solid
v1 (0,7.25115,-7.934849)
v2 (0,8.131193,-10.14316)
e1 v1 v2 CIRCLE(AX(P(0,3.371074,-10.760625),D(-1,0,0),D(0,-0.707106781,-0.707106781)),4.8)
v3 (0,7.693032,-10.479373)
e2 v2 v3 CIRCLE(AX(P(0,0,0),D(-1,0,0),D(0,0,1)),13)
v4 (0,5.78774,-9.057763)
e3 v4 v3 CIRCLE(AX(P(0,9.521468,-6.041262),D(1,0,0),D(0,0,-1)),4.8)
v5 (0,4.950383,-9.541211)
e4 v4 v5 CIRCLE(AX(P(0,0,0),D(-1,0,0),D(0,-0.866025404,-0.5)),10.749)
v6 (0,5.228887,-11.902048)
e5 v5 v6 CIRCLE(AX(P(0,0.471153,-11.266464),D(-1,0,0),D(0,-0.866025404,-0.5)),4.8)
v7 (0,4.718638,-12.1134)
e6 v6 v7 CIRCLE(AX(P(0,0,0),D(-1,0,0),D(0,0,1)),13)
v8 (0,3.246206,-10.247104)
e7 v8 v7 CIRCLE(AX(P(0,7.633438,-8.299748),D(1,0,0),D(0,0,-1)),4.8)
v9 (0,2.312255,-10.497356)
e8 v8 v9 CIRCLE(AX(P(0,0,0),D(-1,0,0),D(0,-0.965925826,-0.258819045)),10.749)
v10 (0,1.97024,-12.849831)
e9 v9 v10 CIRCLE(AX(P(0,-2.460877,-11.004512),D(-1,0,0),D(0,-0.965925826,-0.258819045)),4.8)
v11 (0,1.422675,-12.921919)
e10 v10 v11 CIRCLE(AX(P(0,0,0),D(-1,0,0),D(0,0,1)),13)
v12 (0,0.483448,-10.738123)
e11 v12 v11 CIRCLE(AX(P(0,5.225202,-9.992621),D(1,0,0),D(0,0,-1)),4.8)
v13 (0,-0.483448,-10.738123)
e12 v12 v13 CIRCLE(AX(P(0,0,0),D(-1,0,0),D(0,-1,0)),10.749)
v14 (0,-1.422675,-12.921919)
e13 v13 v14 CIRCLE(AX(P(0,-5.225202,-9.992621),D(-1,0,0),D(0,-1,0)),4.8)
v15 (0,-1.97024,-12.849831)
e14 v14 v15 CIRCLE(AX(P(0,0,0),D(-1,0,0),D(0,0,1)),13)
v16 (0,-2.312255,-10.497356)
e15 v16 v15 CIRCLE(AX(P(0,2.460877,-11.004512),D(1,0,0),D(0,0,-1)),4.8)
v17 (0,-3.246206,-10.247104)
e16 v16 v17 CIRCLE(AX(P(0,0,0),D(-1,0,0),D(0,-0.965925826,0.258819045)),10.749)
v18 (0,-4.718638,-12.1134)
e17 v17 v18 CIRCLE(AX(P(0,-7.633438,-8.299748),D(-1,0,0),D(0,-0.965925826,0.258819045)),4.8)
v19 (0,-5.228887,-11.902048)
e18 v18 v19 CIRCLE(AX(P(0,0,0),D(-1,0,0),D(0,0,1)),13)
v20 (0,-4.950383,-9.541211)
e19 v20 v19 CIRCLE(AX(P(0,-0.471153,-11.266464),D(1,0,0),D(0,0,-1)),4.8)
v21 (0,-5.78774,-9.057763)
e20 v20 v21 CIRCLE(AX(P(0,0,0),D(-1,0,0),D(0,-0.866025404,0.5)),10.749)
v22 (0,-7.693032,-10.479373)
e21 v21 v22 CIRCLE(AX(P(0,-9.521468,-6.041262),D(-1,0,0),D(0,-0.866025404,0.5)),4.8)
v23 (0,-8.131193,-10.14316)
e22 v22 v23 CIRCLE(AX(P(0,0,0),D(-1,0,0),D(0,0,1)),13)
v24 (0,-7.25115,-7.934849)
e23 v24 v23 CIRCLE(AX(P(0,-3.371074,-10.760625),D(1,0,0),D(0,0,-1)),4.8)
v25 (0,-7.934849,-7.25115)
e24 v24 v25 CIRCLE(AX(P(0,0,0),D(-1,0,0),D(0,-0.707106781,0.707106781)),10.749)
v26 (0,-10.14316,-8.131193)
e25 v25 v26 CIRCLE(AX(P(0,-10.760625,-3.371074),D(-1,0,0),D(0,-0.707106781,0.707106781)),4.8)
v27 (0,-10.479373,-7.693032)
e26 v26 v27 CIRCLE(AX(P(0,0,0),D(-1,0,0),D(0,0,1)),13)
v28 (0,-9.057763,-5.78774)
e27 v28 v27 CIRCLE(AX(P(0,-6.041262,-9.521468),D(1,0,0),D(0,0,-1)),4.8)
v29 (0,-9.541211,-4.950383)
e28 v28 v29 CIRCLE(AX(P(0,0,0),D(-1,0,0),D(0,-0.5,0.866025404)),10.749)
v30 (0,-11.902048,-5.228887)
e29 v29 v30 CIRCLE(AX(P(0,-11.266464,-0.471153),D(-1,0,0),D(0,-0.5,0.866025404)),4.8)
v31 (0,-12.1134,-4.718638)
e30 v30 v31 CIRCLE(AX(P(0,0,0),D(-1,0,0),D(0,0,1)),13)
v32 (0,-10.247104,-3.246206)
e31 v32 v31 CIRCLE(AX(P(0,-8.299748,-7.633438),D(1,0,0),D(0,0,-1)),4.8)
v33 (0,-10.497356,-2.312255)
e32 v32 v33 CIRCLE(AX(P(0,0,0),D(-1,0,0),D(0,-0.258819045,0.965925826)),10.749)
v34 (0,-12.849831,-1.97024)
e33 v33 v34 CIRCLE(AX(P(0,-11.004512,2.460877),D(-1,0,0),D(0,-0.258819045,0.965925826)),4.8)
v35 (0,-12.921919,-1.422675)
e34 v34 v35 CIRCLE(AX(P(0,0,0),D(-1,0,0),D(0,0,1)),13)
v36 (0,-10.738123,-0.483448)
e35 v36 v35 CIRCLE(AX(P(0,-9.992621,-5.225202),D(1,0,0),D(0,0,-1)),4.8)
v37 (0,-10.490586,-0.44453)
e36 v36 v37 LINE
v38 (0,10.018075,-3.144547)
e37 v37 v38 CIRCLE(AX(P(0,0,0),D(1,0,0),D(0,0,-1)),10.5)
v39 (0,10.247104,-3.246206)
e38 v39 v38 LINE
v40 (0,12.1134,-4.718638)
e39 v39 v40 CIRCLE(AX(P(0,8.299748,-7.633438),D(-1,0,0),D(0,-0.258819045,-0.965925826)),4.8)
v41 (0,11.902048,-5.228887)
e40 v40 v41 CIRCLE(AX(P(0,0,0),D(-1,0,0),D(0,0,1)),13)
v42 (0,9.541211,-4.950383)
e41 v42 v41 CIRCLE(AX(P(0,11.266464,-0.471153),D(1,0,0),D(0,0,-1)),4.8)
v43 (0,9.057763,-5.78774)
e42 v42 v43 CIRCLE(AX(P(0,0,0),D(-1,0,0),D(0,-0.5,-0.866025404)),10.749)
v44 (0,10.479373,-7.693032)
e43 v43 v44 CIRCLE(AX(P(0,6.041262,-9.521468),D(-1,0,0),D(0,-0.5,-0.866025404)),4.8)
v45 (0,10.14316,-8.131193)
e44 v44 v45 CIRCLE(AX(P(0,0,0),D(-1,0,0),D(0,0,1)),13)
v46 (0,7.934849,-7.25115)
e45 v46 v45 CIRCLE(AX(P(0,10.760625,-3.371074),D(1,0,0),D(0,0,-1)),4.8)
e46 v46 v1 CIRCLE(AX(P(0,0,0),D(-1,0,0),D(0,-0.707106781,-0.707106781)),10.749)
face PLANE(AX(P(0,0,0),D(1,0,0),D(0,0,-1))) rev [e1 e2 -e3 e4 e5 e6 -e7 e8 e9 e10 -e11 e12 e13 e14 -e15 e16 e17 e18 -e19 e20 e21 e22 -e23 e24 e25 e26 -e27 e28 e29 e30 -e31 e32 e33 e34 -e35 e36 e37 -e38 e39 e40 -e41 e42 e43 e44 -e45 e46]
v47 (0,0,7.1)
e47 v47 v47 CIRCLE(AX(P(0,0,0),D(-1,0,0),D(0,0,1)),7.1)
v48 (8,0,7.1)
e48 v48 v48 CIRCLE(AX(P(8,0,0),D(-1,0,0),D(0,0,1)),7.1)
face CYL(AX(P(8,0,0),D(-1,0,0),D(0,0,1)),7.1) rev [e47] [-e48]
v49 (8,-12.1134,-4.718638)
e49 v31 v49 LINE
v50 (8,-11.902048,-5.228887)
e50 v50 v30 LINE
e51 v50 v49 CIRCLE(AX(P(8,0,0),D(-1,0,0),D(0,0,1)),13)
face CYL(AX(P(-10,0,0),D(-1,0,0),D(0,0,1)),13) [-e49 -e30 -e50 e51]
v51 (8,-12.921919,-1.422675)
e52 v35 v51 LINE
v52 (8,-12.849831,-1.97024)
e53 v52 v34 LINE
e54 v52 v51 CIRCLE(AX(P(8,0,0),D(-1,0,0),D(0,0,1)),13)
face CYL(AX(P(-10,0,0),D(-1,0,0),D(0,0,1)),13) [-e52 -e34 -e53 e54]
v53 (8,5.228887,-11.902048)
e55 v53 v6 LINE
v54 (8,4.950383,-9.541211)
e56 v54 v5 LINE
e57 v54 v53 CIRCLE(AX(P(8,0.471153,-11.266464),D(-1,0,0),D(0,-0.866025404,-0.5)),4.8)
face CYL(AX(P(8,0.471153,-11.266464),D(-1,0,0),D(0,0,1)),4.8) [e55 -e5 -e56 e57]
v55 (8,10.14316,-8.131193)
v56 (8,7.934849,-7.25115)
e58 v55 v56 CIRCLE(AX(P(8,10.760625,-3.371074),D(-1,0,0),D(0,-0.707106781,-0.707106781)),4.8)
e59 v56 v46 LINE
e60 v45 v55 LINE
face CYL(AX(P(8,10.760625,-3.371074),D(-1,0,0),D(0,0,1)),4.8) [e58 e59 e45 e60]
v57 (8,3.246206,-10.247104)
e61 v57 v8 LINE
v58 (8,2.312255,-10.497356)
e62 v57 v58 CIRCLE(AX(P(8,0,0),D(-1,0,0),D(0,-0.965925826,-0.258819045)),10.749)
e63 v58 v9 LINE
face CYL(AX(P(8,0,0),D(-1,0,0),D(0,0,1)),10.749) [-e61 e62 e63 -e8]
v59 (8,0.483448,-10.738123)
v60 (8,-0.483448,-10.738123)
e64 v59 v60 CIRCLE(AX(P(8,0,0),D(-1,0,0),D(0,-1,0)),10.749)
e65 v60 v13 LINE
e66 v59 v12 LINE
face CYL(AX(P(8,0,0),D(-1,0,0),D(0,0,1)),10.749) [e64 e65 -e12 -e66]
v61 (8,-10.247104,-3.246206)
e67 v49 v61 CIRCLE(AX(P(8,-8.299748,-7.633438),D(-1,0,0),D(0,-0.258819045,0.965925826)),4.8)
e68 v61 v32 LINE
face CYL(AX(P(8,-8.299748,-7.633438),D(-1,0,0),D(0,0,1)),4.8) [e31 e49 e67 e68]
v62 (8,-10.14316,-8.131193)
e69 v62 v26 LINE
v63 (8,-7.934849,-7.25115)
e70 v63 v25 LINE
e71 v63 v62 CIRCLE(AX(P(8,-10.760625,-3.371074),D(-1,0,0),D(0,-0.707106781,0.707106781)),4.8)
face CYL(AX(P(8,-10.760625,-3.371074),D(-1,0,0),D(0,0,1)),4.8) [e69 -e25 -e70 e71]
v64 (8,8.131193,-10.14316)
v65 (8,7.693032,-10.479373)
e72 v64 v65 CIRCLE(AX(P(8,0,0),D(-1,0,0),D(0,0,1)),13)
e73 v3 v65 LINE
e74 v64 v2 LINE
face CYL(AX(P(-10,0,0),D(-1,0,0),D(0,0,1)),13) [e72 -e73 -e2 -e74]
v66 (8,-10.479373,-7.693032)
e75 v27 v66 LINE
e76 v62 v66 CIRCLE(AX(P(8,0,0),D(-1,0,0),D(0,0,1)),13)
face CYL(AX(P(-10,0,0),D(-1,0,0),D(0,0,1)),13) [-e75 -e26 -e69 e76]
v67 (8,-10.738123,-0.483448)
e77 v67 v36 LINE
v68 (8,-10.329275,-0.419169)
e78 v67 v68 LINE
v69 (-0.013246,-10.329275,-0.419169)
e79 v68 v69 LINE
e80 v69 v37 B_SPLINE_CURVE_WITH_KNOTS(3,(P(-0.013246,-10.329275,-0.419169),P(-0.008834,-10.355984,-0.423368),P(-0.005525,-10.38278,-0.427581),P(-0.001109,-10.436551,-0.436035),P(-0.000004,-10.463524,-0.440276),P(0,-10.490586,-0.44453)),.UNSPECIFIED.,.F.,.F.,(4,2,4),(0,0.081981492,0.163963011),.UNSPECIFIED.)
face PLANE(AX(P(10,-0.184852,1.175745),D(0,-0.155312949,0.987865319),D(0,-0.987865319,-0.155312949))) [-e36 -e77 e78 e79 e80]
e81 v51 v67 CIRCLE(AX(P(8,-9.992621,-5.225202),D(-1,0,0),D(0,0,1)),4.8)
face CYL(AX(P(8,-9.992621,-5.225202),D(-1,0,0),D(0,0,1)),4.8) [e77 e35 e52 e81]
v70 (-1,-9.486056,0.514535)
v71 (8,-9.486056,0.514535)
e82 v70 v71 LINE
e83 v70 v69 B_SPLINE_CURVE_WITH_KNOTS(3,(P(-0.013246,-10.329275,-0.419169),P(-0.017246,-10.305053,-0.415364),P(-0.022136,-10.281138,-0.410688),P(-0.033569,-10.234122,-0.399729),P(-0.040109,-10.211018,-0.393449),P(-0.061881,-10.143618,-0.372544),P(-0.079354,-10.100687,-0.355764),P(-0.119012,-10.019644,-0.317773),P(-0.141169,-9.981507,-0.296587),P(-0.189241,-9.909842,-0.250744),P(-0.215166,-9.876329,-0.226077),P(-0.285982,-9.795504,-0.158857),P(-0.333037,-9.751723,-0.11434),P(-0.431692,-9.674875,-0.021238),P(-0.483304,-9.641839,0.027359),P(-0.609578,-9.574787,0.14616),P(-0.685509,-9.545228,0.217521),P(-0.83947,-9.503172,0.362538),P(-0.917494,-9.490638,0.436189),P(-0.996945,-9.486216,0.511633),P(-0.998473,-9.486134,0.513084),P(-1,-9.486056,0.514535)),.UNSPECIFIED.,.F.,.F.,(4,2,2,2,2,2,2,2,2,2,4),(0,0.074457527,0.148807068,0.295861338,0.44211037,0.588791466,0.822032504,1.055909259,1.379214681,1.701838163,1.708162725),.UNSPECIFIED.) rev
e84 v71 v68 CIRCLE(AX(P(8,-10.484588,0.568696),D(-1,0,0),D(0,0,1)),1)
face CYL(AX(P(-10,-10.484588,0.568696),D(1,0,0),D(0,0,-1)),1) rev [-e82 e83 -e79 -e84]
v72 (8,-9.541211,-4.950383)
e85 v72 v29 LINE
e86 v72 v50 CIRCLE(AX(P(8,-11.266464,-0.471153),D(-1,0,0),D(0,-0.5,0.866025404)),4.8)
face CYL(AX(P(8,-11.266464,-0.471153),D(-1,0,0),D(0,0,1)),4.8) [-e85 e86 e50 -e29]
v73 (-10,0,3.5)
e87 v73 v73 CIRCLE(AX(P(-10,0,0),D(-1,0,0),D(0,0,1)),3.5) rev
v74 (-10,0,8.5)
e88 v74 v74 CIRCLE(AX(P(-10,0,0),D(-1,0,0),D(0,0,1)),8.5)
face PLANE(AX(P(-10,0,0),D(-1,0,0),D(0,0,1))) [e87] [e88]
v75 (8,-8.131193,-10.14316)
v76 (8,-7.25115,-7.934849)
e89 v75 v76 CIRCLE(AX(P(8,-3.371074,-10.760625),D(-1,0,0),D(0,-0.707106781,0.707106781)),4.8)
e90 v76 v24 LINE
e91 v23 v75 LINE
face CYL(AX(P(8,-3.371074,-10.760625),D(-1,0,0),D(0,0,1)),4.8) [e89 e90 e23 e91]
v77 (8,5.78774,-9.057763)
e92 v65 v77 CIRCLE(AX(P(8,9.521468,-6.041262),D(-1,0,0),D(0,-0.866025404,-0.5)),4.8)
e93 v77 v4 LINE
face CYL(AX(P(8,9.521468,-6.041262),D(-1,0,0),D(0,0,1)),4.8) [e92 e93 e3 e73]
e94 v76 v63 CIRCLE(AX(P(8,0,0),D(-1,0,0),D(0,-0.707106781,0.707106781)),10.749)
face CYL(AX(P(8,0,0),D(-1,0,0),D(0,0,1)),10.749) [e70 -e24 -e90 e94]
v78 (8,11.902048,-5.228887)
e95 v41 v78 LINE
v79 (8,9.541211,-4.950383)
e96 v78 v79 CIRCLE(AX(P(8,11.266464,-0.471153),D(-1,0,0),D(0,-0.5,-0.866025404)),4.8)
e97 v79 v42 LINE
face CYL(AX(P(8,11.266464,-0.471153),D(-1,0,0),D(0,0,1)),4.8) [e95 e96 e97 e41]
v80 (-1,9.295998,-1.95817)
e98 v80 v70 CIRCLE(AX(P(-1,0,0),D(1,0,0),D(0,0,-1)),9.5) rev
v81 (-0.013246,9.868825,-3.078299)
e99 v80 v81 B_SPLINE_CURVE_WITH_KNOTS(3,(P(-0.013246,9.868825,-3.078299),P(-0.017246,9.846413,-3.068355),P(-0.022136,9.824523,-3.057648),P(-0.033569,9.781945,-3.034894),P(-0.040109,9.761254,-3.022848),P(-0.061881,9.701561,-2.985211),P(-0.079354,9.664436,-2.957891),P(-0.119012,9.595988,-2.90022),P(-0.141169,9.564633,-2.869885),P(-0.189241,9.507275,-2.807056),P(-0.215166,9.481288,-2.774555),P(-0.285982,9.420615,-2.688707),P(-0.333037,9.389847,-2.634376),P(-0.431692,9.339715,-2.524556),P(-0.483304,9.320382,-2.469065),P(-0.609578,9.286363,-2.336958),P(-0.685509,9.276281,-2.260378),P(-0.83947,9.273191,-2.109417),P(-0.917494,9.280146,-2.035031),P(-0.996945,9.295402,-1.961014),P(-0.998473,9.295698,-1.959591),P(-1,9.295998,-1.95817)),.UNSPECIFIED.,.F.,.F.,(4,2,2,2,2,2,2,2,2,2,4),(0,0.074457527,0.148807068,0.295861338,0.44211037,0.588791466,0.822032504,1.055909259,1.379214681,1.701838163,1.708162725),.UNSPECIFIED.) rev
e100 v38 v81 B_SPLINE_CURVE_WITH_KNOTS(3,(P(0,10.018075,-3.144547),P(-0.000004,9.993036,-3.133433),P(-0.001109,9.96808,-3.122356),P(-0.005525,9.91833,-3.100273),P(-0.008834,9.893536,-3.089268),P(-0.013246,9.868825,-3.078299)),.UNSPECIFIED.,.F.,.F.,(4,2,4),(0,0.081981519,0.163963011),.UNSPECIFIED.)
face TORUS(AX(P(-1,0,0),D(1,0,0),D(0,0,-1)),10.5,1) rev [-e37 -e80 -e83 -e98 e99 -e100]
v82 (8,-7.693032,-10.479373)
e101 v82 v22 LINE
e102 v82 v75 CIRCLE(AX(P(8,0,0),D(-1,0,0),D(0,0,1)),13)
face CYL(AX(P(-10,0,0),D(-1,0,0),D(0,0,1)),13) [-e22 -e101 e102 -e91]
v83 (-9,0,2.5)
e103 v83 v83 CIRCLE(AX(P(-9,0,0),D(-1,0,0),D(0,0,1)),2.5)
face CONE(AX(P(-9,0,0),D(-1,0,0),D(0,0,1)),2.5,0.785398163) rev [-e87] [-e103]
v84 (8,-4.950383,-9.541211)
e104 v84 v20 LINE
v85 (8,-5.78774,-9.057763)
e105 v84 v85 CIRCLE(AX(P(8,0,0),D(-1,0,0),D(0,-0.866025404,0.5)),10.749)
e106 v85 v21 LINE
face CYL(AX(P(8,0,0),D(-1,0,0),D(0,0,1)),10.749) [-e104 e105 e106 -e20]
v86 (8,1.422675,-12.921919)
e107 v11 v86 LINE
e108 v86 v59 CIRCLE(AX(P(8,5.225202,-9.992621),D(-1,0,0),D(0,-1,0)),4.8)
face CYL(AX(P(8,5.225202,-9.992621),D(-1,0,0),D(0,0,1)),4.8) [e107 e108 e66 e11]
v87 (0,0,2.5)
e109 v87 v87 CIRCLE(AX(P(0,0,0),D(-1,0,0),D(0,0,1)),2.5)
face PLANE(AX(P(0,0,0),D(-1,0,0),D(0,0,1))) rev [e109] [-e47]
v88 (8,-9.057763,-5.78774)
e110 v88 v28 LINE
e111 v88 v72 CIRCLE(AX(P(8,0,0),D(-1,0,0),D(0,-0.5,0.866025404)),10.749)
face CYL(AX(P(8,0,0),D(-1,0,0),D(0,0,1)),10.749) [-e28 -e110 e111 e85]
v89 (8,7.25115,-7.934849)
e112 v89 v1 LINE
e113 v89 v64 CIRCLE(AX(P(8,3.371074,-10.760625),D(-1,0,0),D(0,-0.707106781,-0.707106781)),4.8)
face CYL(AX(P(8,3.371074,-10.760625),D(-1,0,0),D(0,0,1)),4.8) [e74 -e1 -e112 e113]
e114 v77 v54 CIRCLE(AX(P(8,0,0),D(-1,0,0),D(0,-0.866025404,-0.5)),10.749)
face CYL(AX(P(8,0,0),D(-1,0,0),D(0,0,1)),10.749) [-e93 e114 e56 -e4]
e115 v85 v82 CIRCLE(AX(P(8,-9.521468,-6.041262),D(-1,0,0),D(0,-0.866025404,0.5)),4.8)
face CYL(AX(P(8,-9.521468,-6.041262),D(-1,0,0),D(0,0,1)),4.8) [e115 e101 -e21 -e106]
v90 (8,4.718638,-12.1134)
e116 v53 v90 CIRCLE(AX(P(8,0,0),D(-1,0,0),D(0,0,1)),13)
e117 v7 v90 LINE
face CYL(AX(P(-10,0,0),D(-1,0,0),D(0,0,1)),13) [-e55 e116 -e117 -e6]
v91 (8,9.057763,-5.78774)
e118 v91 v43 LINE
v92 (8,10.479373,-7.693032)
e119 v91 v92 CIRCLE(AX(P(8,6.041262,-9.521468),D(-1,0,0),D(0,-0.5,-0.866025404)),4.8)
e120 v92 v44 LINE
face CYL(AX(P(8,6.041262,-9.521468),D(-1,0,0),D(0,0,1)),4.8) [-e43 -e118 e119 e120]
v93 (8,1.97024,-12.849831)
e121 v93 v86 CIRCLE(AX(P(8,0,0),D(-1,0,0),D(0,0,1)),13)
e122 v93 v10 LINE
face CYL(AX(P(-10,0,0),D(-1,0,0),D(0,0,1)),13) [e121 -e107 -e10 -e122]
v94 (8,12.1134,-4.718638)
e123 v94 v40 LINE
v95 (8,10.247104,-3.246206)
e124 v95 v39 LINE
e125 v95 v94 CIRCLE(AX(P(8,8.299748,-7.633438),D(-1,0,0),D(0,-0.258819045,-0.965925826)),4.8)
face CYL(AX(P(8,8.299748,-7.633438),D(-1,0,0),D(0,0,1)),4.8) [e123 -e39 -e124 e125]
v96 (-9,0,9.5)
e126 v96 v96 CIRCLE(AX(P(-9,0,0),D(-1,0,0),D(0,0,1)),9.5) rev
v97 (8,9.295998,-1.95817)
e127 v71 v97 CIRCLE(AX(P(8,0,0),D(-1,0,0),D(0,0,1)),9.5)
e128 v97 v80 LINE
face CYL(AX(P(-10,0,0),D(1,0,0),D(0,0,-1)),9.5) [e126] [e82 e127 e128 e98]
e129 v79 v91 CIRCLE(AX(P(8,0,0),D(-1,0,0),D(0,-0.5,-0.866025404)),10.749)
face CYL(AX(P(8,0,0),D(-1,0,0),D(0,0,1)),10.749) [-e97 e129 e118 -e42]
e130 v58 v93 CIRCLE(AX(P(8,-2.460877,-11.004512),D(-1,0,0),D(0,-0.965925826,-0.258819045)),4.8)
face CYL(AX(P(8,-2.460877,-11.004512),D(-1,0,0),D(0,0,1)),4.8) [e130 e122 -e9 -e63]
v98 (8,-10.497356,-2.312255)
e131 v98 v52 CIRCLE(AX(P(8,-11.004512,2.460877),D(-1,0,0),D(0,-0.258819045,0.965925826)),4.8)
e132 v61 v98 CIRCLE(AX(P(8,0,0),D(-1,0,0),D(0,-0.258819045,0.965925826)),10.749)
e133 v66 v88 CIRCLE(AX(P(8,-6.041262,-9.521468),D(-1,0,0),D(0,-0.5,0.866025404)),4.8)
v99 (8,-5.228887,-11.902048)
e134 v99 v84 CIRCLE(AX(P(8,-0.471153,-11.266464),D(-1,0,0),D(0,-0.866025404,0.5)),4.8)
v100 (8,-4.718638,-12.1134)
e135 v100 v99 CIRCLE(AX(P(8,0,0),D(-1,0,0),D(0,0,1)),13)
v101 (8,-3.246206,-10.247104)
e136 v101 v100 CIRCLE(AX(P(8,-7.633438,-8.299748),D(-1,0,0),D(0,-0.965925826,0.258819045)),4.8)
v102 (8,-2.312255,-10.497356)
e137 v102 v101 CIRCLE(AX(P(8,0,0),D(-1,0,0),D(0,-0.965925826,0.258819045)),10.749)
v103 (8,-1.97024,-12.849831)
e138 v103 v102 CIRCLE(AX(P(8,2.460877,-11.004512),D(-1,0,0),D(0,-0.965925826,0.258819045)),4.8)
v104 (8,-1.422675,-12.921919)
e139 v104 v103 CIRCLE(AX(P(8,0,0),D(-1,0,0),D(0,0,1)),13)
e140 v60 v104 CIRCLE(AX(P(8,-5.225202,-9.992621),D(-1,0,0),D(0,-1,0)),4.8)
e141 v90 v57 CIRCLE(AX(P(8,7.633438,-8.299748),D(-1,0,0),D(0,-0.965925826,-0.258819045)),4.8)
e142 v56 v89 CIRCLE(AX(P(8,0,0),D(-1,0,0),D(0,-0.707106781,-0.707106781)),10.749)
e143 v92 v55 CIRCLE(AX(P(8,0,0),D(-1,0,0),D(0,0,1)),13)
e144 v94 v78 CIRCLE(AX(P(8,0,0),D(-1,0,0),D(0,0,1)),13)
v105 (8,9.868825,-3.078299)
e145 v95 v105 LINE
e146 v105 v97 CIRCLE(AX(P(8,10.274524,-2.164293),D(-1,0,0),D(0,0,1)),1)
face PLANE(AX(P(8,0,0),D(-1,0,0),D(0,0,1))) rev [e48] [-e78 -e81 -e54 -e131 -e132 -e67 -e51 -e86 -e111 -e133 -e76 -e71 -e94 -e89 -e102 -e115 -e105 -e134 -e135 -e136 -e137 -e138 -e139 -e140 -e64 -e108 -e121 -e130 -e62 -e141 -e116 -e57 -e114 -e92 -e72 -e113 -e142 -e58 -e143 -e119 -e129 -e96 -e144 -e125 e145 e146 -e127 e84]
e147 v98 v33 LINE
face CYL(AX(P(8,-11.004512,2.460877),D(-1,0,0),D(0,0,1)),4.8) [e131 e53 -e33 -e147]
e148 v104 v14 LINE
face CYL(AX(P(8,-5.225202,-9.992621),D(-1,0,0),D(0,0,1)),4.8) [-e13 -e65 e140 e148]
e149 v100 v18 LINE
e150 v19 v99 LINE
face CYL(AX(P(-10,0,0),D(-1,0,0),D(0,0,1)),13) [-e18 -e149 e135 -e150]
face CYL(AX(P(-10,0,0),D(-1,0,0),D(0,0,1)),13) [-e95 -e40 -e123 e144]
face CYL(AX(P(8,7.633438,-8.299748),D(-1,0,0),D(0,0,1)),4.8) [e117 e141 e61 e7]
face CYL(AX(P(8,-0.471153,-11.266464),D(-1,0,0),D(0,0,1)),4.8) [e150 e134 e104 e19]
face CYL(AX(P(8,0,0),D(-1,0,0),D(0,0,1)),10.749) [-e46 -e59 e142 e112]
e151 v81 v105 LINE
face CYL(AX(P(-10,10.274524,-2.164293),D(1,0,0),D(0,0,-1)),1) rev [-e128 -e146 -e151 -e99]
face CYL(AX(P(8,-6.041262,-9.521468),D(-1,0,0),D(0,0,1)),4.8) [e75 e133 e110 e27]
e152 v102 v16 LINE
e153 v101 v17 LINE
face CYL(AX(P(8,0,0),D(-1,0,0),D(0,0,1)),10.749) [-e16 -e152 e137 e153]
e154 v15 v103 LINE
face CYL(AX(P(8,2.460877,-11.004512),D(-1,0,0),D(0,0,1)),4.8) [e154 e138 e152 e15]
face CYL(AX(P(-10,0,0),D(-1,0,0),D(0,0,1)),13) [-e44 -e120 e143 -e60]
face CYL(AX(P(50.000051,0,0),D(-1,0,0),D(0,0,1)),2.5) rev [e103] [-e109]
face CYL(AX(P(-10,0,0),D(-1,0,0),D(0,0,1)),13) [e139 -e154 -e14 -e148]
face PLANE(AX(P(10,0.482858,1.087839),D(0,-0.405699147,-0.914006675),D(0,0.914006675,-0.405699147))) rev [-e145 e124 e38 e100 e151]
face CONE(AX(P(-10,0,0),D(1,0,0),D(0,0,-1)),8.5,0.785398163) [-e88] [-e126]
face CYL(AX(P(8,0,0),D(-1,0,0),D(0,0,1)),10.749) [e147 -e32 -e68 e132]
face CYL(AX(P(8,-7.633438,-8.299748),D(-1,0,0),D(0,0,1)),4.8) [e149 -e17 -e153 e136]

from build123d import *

# Parameters (mm, degrees)
BASPROSKE_W         = 8
BASPROSKE_H         = 13
TOOTHCUT_DEPTH      = 21.049937656
TEETHCUTS_COUNT     = 24
TEETHCUTS_ANGLE     = 345
BORSKE_R            = 2.5
BORE_DEPTH          = 50.0000508
SKETCH2_R           = 9.5
SKETCH2_R_2         = 7.1
SKETCH2_R_3         = 2.5
BOSS_EXTRUDE1_DEPTH = 10
CUT_EXTRUDE1_DEPTH  = 10
SKETCH2_4_R         = 7.1
SKETCH2_4_R_2       = 2.5
CUT_EXTRUDE2_DEPTH  = 21.83151436
FILLET1_R           = 1
CHAMFER1_SIZE       = 1


with BuildPart() as part:
    # BasProSke → Base-Revolve (revolve)
    with BuildSketch(Plane(origin=(0, 0, 0), x_dir=(1, 0, 0), z_dir=(0, 1, 0)), mode=Mode.PRIVATE) as base_revolve_sk:
        with Locations((4, 6.5)):
            Rectangle(BASPROSKE_W, BASPROSKE_H)
    revolve(base_revolve_sk.sketch.rotate(Axis((-10, 0, 0), (1, 0, 0)), 180), axis=Axis((-10, 0, 0), (1, 0, 0)))

    # TooCutSke → ToothCut (cut, through all)
    with BuildSketch(Plane(origin=(0, 0, 0), x_dir=(0, 0, -1), z_dir=(1, 0, 0))):
        with BuildLine():
            ThreePointArc((0.483448384, 10.738122679), (0, 10.749), (-0.483448384, 10.738122679))
            ThreePointArc((-0.483448384, 10.738122679), (-0.821636462, 11.902754369), (-1.44092227, 12.945454344))
            ThreePointArc((-1.44092227, 12.945454344), (0, 13.0254), (1.44092227, 12.945454344))
            ThreePointArc((1.44092227, 12.945454344), (0.821636462, 11.902754369), (0.483448384, 10.738122679))
        make_face()
    toothcut = extrude(amount=TOOTHCUT_DEPTH, mode=Mode.SUBTRACT)

    # TeethCuts: ToothCut ×24 about axis
    teethcuts_axis = Axis((-10, 0, 0), (1, 0, 0))
    for i in range(1, TEETHCUTS_COUNT):
        add(toothcut.rotate(teethcuts_axis, i * TEETHCUTS_ANGLE / (TEETHCUTS_COUNT - 1)), mode=Mode.SUBTRACT)

    # BorSke → Bore (cut, symmetric)
    with BuildSketch(Plane(origin=(0, 0, 0), x_dir=(0, 0, -1), z_dir=(1, 0, 0))):
        with Locations(Location((0, 0, 0), (0, 0, 180))):
            Circle(BORSKE_R)
    extrude(amount=BORE_DEPTH, both=True, mode=Mode.SUBTRACT)

    # Sketch2 → Boss-Extrude1 (add)
    # profile 1 of 2: a face of its own
    with BuildSketch(Plane.ZY):
        with Locations(Location((0, 0, 0), (0, 0, 180))):
            Circle(SKETCH2_R)
        Circle(SKETCH2_R_2, mode=Mode.SUBTRACT)
    # profile 2 of 2: a face of its own
    with BuildSketch(Plane.ZY):
        Circle(SKETCH2_R_2)
        Circle(SKETCH2_R_3, mode=Mode.SUBTRACT)
    extrude(amount=BOSS_EXTRUDE1_DEPTH)

    # Sketch2<3> → Cut-Extrude1 (cut)
    with BuildSketch(Plane.ZY):
        with BuildLine():
            ThreePointArc((-2.312255378, 10.49735567), (-2.782045916, 10.382736707), (-3.246205938, 10.247104372))
            Line((-3.246205938, 10.247104372), (-2.735935918, 9.097508156))
            ThreePointArc((-2.735935918, 9.097508156), (5.668271729, 7.623693043), (9.5, 0))
            ThreePointArc((9.5, 0), (6.614870502, -6.818613367), (-0.288102788, -9.495630405))
            Line((-0.288102788, -9.495630405), (-0.483448384, -10.738122679))
            ThreePointArc((-0.483448384, -10.738122679), (0, -10.749), (0.483448384, -10.738122679))
            ThreePointArc((0.483448384, -10.738122679), (0.815732219, -11.889084866), (1.422675204, -12.921919179))
            ThreePointArc((1.422675204, -12.921919179), (1.696840499, -12.888783198), (1.970240061, -12.849830898))
            ThreePointArc((1.970240061, -12.849830898), (2.289184775, -11.695101157), (2.312255378, -10.49735567))
            ThreePointArc((2.312255378, -10.49735567), (2.782045916, -10.382736707), (3.246205938, -10.247104372))
            ThreePointArc((3.246205938, -10.247104372), (3.86505841, -11.272847089), (4.718637505, -12.113400022))
            ThreePointArc((4.718637505, -12.113400022), (4.974884621, -12.010433923), (5.228886722, -11.902047876))
            ThreePointArc((5.228886722, -11.902047876), (5.238097609, -10.704115631), (4.950382757, -9.541211221))
            ThreePointArc((4.950382757, -9.541211221), (5.3745, -9.308907065), (5.787739922, -9.057762836))
            ThreePointArc((5.787739922, -9.057762836), (6.650987257, -9.888383413), (7.693032457, -10.479372673))
            ThreePointArc((7.693032457, -10.479372673), (7.913898577, -10.313593424), (8.131193393, -10.143159961))
            ThreePointArc((8.131193393, -10.143159961), (7.830042747, -8.983662315), (7.251149732, -7.934848994))
            ThreePointArc((7.251149732, -7.934848994), (7.600690791, -7.600690791), (7.934848994, -7.251149732))
            ThreePointArc((7.934848994, -7.251149732), (8.983662315, -7.830042747), (10.143159961, -8.131193393))
            ThreePointArc((10.143159961, -8.131193393), (10.313593424, -7.913898577), (10.479372673, -7.693032457))
            ThreePointArc((10.479372673, -7.693032457), (9.888383413, -6.650987257), (9.057762836, -5.787739922))
            ThreePointArc((9.057762836, -5.787739922), (9.308907065, -5.3745), (9.541211221, -4.950382757))
            ThreePointArc((9.541211221, -4.950382757), (10.704115631, -5.238097609), (11.902047876, -5.228886722))
            ThreePointArc((11.902047876, -5.228886722), (12.010433923, -4.974884621), (12.113400022, -4.718637505))
            ThreePointArc((12.113400022, -4.718637505), (11.272847089, -3.86505841), (10.247104372, -3.246205938))
            ThreePointArc((10.247104372, -3.246205938), (10.382736707, -2.782045916), (10.49735567, -2.312255378))
            ThreePointArc((10.49735567, -2.312255378), (11.695101157, -2.289184775), (12.849830898, -1.970240061))
            ThreePointArc((12.849830898, -1.970240061), (12.888783198, -1.696840499), (12.921919179, -1.422675204))
            ThreePointArc((12.921919179, -1.422675204), (11.889084866, -0.815732219), (10.738122679, -0.483448384))
            ThreePointArc((10.738122679, -0.483448384), (10.749, 0), (10.738122679, 0.483448384))
            ThreePointArc((10.738122679, 0.483448384), (11.889084866, 0.815732219), (12.921919179, 1.422675204))
            ThreePointArc((12.921919179, 1.422675204), (12.888783198, 1.696840499), (12.849830898, 1.970240061))
            ThreePointArc((12.849830898, 1.970240061), (11.695101157, 2.289184775), (10.49735567, 2.312255378))
            ThreePointArc((10.49735567, 2.312255378), (10.382736707, 2.782045916), (10.247104372, 3.246205938))
            ThreePointArc((10.247104372, 3.246205938), (11.272847089, 3.86505841), (12.113400022, 4.718637505))
            ThreePointArc((12.113400022, 4.718637505), (12.010433923, 4.974884621), (11.902047876, 5.228886722))
            ThreePointArc((11.902047876, 5.228886722), (10.704115631, 5.238097609), (9.541211221, 4.950382757))
            ThreePointArc((9.541211221, 4.950382757), (9.308907065, 5.3745), (9.057762836, 5.787739922))
            ThreePointArc((9.057762836, 5.787739922), (9.888383413, 6.650987257), (10.479372673, 7.693032457))
            ThreePointArc((10.479372673, 7.693032457), (10.313593424, 7.913898577), (10.143159961, 8.131193393))
            ThreePointArc((10.143159961, 8.131193393), (8.983662315, 7.830042747), (7.934848994, 7.251149732))
            ThreePointArc((7.934848994, 7.251149732), (7.600690791, 7.600690791), (7.251149732, 7.934848994))
            ThreePointArc((7.251149732, 7.934848994), (7.830042747, 8.983662315), (8.131193393, 10.143159961))
            ThreePointArc((8.131193393, 10.143159961), (7.913898577, 10.313593424), (7.693032457, 10.479372673))
            ThreePointArc((7.693032457, 10.479372673), (6.650987257, 9.888383413), (5.787739922, 9.057762836))
            ThreePointArc((5.787739922, 9.057762836), (5.3745, 9.308907065), (4.950382757, 9.541211221))
            ThreePointArc((4.950382757, 9.541211221), (5.238097609, 10.704115631), (5.228886722, 11.902047876))
            ThreePointArc((5.228886722, 11.902047876), (4.974884621, 12.010433923), (4.718637505, 12.113400022))
            ThreePointArc((4.718637505, 12.113400022), (3.86505841, 11.272847089), (3.246205938, 10.247104372))
            ThreePointArc((3.246205938, 10.247104372), (2.782045916, 10.382736707), (2.312255378, 10.49735567))
            ThreePointArc((2.312255378, 10.49735567), (2.289184775, 11.695101157), (1.970240061, 12.849830898))
            ThreePointArc((1.970240061, 12.849830898), (1.696840499, 12.888783198), (1.422675204, 12.921919179))
            ThreePointArc((1.422675204, 12.921919179), (0.815732219, 11.889084866), (0.483448384, 10.738122679))
            ThreePointArc((0.483448384, 10.738122679), (0, 10.749), (-0.483448384, 10.738122679))
            ThreePointArc((-0.483448384, 10.738122679), (-0.815732219, 11.889084866), (-1.422675204, 12.921919179))
            ThreePointArc((-1.422675204, 12.921919179), (-1.696840499, 12.888783198), (-1.970240061, 12.849830898))
            ThreePointArc((-1.970240061, 12.849830898), (-2.289184775, 11.695101157), (-2.312255378, 10.49735567))
        make_face()
    extrude(amount=-CUT_EXTRUDE1_DEPTH, mode=Mode.SUBTRACT)

    # Sketch2<4> → Cut-Extrude2 (cut, through all)
    with BuildSketch(Plane.ZY):
        Circle(SKETCH2_4_R)
        Circle(SKETCH2_4_R_2, mode=Mode.SUBTRACT)
    extrude(amount=-CUT_EXTRUDE2_DEPTH, mode=Mode.SUBTRACT)

    # Fillet1
    # the kernel refuses this fillet: 1 mm, written as the material it adds along each edge
    with BuildSketch(Plane(origin=(0, 0, 0), x_dir=(0, 0, -1), z_dir=(0, 1, 0))) as fillet1_piece_1_section:
        with BuildLine():
            CenterArc((9.5 + FILLET1_R, FILLET1_R), FILLET1_R, 180, 90)
            Line((9.5, FILLET1_R), (9.5, 0))
            Line((9.5, 0), (9.5 + FILLET1_R, 0))
        make_face()
    fillet1_piece_1 = revolve(axis=Axis((0, 0, 0), (-1, 0, 0)), revolution_arc=103.345808715, mode=Mode.PRIVATE)
    fillet1_piece_1 = split(fillet1_piece_1, bisect_by=Plane(origin=(-0.281845865, -7.908879118, -0.038632524), z_dir=(0, 0.15531294924134567, -0.9878653186532844)), keep=Keep.TOP, mode=Mode.PRIVATE)
    add(fillet1_piece_1)
    with BuildSketch(Plane(origin=(0, -9.495630405, -0.288102788), x_dir=(0, -0.9878653186532845, -0.15531294924134548), z_dir=(1, 0, 0))) as fillet1_piece_2:
        with BuildLine():
            CenterArc((0.843884873, -1), FILLET1_R, 90, 77.960305795)
            ThreePointArc((-0.134118453, -0.791410704), (-0.058696795, -0.397122513), (0, 0))
            Line((0, 0), (0.843884873, 0))
        make_face()
    extrude(amount=8)
    with BuildSketch(Plane(origin=(0, 9.097508156, -2.735935918), x_dir=(0, 0.9140066749677942, -0.4056991472930614), z_dir=(1, 0, 0))) as fillet1_piece_3:
        with BuildLine():
            CenterArc((0.843884873, 1), FILLET1_R, 192.039694205, 77.960305795)
            ThreePointArc((-0.134118453, 0.791410704), (-0.058696795, 0.397122513), (0, 0))
            Line((0, 0), (0.843884873, 0))
        make_face()
    extrude(amount=8)
    with BuildSketch(Plane(origin=(0, 0, 0), x_dir=(0, 0.9995823457354229, -0.028898686718770317), z_dir=(0, 0.028898686718770317, 0.9995823457354229))) as fillet1_piece_4_section:
        with BuildLine():
            CenterArc((9.5 + FILLET1_R, FILLET1_R), FILLET1_R, 180, 90)
            Line((9.5, FILLET1_R), (9.5, 0))
            Line((9.5, 0), (9.5 + FILLET1_R, 0))
        make_face()
    fillet1_piece_4 = revolve(axis=Axis((0, 0, 0), (-1, 0, 0)), revolution_arc=88.343996666, mode=Mode.PRIVATE)
    fillet1_piece_4 = split(fillet1_piece_4, bisect_by=Plane(origin=(-0.282512294, 8.270021566, -2.368640346), z_dir=(0, -0.4056991472930615, -0.9140066749677941)), keep=Keep.TOP, mode=Mode.PRIVATE)
    add(fillet1_piece_4)
    with BuildSketch(Plane(origin=(0, 0, 0), x_dir=(0, 0, -1), z_dir=(0, 1, 0))) as fillet1_piece_5a_section:
        with BuildLine():
            CenterArc((9.5 + FILLET1_R, FILLET1_R), FILLET1_R, 180, 90)
            Line((9.5, FILLET1_R), (9.5, 0))
            Line((9.5, 0), (9.5 + FILLET1_R, 0))
        make_face()
    fillet1_piece_5a = revolve(axis=Axis((0, 0, 0), (-1, 0, 0)), revolution_arc=103.345808715, mode=Mode.PRIVATE)
    fillet1_piece_5a = split(fillet1_piece_5a, bisect_by=Plane(origin=(-0.222264808, -9.459956662, -0.282494135), z_dir=(0, -0.15531294924134567, 0.9878653186532844)), keep=Keep.TOP, mode=Mode.PRIVATE)
    with BuildSketch(Plane(origin=(-2.109712182, -9.495630405, -0.288102788), x_dir=(0, -0.9878653186532844, -0.15531294924134598), z_dir=(1, 0, 0))) as fillet1_piece_5b_section:
        with BuildLine():
            CenterArc((0.843884873, -1), FILLET1_R, 90, 77.960305795)
            ThreePointArc((-0.134118453, -0.791410704), (-0.058696795, -0.397122513), (0, 0))
            Line((0, 0), (0.843884873, 0))
        make_face()
    fillet1_piece_5b = extrude(amount=10.109712182, mode=Mode.PRIVATE)
    fillet1_piece_5b = split(fillet1_piece_5b, bisect_by=Plane(origin=(0, -9.685689477, -0.139811966), z_dir=(-1, 0, 0)), keep=Keep.TOP, mode=Mode.PRIVATE)
    fillet1_piece_5 = fillet1_piece_5a & fillet1_piece_5b
    add(fillet1_piece_5)
    with BuildSketch(Plane(origin=(0, 0, 0), x_dir=(0, 0.9995823457354229, -0.028898686718770317), z_dir=(0, 0.028898686718770317, 0.9995823457354229))) as fillet1_piece_6a_section:
        with BuildLine():
            CenterArc((9.5 + FILLET1_R, FILLET1_R), FILLET1_R, 180, 90)
            Line((9.5, FILLET1_R), (9.5, 0))
            Line((9.5, 0), (9.5 + FILLET1_R, 0))
        make_face()
    fillet1_piece_6a = revolve(axis=Axis((0, 0, 0), (-1, 0, 0)), revolution_arc=88.343996666, mode=Mode.PRIVATE)
    fillet1_piece_6a = split(fillet1_piece_6a, bisect_by=Plane(origin=(-0.222264609, 9.064543487, -2.721303926), z_dir=(0, 0.4056991472930615, 0.9140066749677941)), keep=Keep.TOP, mode=Mode.PRIVATE)
    with BuildSketch(Plane(origin=(-2.109712182, 9.097508156, -2.735935918), x_dir=(0, 0.9140066749677942, -0.4056991472930614), z_dir=(1, 0, 0))) as fillet1_piece_6b_section:
        with BuildLine():
            CenterArc((0.843884873, 1), FILLET1_R, 192.039694205, 77.960305795)
            ThreePointArc((-0.134118453, 0.791410704), (-0.058696795, 0.397122513), (0, 0))
            Line((0, 0), (0.843884873, 0))
        make_face()
    fillet1_piece_6b = extrude(amount=10.109712182, mode=Mode.PRIVATE)
    fillet1_piece_6b = split(fillet1_piece_6b, bisect_by=Plane(origin=(0, 9.319471612, -2.641888891), z_dir=(-1, 0, 0)), keep=Keep.TOP, mode=Mode.PRIVATE)
    fillet1_piece_6 = fillet1_piece_6a & fillet1_piece_6b
    add(fillet1_piece_6)

    # Chamfer1
    chamfer1_edges = [part.edges().sort_by_distance(p)[0] for p in [
        (-10, 0, -2.5),
        (-10, 0, 9.5),
    ]]
    chamfer(chamfer1_edges, length=CHAMFER1_SIZE)


solid = part.part
